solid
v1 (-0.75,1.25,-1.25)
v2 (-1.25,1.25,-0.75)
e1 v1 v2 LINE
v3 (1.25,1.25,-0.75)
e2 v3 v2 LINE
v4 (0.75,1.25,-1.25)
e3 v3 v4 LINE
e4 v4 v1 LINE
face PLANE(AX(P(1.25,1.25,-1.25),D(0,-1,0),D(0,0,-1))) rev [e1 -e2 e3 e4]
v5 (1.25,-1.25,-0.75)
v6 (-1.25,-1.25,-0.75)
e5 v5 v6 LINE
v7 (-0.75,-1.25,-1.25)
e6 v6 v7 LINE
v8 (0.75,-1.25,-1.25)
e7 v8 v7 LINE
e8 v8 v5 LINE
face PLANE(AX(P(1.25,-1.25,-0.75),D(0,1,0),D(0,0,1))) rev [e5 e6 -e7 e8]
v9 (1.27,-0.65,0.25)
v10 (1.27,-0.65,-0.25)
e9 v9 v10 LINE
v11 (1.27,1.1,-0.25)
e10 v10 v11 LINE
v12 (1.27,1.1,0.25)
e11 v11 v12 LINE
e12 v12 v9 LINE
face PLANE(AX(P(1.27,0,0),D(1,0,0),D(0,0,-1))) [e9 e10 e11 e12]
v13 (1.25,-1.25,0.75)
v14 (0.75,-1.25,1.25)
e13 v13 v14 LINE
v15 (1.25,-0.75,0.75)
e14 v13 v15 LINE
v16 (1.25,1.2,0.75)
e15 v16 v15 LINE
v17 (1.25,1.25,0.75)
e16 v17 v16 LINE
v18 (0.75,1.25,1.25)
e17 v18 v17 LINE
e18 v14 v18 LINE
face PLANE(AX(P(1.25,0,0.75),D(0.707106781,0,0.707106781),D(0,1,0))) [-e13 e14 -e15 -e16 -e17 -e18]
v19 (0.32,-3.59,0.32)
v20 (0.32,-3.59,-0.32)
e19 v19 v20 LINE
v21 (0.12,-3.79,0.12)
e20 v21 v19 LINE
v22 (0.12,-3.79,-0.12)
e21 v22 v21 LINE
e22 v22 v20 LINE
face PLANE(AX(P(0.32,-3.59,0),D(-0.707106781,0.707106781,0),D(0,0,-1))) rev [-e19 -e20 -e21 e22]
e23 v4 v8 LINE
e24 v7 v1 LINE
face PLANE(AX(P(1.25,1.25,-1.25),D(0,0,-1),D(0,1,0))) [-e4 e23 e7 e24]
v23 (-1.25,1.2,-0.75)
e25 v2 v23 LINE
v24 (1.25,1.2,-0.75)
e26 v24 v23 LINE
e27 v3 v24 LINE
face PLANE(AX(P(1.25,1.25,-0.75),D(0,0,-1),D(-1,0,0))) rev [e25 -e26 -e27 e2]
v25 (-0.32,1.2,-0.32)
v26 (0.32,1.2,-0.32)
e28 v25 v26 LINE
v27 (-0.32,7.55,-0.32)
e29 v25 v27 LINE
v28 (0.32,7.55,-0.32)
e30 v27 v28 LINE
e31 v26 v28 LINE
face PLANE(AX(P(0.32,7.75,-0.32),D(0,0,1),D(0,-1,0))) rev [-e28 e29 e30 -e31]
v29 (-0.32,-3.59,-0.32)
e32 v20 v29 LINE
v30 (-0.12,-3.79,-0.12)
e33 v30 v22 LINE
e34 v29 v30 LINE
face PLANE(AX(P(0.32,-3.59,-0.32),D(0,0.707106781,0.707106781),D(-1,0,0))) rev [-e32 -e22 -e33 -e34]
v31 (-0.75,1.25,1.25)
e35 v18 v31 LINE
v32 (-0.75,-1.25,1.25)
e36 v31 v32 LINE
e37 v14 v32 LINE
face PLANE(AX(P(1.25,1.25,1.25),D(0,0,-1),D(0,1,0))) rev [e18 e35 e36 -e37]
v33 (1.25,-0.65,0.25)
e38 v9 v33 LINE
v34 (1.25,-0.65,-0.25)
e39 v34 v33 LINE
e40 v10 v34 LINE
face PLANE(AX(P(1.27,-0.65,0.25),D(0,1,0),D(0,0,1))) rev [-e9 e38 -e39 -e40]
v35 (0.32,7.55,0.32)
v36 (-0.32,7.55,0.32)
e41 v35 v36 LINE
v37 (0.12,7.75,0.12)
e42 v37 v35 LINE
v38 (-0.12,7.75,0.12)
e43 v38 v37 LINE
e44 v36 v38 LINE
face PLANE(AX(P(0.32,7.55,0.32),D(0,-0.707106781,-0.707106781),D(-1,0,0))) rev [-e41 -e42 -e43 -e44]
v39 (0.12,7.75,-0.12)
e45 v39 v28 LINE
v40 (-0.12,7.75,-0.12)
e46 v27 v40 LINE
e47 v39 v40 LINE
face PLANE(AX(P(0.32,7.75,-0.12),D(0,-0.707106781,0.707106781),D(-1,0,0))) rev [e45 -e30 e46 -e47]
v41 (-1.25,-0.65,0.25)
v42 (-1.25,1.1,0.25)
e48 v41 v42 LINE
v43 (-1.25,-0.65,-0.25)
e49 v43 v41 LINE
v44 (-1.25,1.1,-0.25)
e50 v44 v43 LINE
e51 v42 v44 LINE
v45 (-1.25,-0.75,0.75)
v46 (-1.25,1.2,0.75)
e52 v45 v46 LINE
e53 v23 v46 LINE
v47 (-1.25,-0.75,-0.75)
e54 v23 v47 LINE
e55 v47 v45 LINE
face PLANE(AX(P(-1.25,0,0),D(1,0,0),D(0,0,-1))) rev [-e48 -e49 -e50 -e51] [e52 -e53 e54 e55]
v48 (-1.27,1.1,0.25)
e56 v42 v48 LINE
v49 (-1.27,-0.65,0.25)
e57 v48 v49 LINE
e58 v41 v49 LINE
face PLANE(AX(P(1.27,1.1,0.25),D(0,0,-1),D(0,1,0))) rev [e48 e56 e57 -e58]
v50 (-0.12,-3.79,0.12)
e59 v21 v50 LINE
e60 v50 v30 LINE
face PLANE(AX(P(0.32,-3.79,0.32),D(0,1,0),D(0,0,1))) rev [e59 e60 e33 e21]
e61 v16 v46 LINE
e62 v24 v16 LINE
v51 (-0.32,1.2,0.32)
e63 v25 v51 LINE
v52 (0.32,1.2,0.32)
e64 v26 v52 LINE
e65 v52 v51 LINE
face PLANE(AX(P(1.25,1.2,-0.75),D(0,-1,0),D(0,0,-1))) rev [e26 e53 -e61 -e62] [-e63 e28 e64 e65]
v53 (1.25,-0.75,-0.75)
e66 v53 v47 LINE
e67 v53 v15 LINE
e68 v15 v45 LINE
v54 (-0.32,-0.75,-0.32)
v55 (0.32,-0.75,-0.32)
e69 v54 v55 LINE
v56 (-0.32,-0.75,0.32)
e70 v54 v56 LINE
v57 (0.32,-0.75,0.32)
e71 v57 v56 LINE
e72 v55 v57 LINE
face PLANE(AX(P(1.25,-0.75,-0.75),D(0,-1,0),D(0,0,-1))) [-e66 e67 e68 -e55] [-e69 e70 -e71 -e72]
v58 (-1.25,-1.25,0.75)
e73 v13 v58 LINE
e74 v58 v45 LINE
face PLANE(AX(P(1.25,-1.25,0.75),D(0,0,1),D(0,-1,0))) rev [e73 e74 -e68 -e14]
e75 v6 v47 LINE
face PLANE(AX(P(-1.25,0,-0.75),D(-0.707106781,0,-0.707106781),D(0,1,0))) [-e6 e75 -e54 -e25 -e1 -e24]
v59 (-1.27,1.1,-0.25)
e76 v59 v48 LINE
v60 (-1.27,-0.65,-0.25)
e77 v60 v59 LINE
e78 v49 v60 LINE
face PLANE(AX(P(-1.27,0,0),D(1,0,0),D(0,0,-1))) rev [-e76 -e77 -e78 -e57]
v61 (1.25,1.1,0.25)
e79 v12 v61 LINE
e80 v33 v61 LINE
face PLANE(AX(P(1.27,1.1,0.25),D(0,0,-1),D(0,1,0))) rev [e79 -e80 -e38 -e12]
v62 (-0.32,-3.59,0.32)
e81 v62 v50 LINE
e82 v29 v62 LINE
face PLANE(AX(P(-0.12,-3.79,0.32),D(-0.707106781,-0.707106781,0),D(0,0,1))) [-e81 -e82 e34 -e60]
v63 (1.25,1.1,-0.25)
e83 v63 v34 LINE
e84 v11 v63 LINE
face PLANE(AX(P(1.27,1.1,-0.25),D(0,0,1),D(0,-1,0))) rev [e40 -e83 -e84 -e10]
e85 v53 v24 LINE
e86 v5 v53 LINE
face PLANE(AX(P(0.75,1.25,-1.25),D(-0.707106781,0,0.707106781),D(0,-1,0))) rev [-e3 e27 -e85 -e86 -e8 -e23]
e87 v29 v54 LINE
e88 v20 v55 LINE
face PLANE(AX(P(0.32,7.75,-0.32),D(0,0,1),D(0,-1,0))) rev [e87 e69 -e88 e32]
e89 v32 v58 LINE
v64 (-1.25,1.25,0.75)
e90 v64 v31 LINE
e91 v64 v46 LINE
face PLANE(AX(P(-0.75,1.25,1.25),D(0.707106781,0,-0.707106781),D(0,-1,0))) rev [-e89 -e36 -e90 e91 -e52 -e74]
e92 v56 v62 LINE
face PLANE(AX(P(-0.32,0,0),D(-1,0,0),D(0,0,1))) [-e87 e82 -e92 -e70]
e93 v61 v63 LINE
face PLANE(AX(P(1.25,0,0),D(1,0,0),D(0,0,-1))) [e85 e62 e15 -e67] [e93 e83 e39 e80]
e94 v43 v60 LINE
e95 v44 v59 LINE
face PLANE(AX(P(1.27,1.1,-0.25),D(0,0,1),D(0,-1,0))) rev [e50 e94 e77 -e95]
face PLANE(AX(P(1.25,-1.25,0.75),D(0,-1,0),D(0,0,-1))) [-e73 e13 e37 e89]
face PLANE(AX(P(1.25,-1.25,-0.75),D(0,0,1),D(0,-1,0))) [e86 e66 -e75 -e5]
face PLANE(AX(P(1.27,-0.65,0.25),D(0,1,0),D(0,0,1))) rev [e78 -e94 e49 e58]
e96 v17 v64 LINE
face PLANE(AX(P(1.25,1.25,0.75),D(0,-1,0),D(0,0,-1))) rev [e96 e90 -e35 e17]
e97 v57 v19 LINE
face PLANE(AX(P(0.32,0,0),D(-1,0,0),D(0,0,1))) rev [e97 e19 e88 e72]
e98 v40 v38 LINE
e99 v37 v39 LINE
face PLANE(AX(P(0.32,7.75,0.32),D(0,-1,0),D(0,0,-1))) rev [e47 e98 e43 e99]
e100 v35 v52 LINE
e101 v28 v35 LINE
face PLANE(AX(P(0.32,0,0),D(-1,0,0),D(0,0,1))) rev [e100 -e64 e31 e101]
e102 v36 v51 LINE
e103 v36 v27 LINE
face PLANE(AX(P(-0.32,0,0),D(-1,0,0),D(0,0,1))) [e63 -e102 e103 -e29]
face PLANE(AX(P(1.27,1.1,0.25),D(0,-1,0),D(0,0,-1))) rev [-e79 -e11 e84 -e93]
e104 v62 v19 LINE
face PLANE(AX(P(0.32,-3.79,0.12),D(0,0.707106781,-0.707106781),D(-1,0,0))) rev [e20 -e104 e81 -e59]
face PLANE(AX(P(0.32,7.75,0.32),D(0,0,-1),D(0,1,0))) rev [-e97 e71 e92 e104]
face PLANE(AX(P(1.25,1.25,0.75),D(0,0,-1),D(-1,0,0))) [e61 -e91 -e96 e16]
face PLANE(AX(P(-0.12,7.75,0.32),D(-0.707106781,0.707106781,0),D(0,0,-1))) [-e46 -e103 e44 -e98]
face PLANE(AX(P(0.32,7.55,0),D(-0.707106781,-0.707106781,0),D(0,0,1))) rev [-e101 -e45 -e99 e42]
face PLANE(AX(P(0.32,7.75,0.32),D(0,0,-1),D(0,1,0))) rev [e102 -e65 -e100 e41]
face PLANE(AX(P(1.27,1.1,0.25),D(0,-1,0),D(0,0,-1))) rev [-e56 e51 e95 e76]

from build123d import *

# Parameters (mm, degrees)
SKETCH1_W           = 0.64
SKETCH1_H           = 11.54
BOSS_EXTRUDE1_DEPTH = 0.32
BOSS_EXTRUDE3_DEPTH = 1.25
CHAMFER1_SIZE       = 0.5
SKETCH3_W           = 0.5
SKETCH3_H           = 1.75
BOSS_EXTRUDE4_DEPTH = 1.27
CHAMFER2_SIZE       = 0.2


with BuildPart() as part:
    # Sketch1 → Boss-Extrude1 (new, symmetric)
    with BuildSketch(Plane(origin=(0, 0, 0), x_dir=(0, 0, -1), z_dir=(1, 0, 0))):
        with Locations((0, 1.98)):
            Rectangle(SKETCH1_W, SKETCH1_H)
    extrude(amount=BOSS_EXTRUDE1_DEPTH, both=True)

    # Sketch2 → Boss-Extrude3 (add, symmetric)
    with BuildSketch(Plane(origin=(0, 0, 0), x_dir=(0, -1, 0), z_dir=(1, 0, 0))):
        Polygon((-1.25, 1.25), (1.25, 1.25), (1.25, 0.75), (0.75, 0.75), (0.75, -0.75), (1.25, -0.75), (1.25, -1.25), (-1.25, -1.25), (-1.25, -0.75), (-1.2, -0.75), (-1.2, 0.75), (-1.25, 0.75), align=None)
    extrude(amount=BOSS_EXTRUDE3_DEPTH, both=True)

    # Chamfer1
    chamfer1_edges = [part.edges().sort_by_distance(p)[0] for p in [
        (1.25, 0, 1.25),
        (1.25, 0, -1.25),
        (-1.25, 0, 1.25),
        (-1.25, 0, -1.25),
    ]]
    chamfer(chamfer1_edges, length=CHAMFER1_SIZE - 0.0001)  # a hair under: the kernel refuses the full size

    # Sketch3 → Boss-Extrude4 (add, symmetric)
    with BuildSketch(Plane(origin=(0, 0, 0), x_dir=(0, 0, -1), z_dir=(1, 0, 0))):
        with Locations((0, 0.225)):
            Rectangle(SKETCH3_W, SKETCH3_H)
    extrude(amount=BOSS_EXTRUDE4_DEPTH, both=True)

    # Chamfer2
    chamfer2_edges = [part.edges().sort_by_distance(p)[0] for p in [
        (0.32, -3.79, 0),
        (0.32, 7.75, 0),
        (-0.32, -3.79, 0),
        (-0.32, 7.75, 0),
        (0, 7.75, -0.32),
        (0, -3.79, -0.32),
        (0, -3.79, 0.32),
        (0, 7.75, 0.32),
    ]]
    chamfer(chamfer2_edges, length=CHAMFER2_SIZE)


solid = part.part
